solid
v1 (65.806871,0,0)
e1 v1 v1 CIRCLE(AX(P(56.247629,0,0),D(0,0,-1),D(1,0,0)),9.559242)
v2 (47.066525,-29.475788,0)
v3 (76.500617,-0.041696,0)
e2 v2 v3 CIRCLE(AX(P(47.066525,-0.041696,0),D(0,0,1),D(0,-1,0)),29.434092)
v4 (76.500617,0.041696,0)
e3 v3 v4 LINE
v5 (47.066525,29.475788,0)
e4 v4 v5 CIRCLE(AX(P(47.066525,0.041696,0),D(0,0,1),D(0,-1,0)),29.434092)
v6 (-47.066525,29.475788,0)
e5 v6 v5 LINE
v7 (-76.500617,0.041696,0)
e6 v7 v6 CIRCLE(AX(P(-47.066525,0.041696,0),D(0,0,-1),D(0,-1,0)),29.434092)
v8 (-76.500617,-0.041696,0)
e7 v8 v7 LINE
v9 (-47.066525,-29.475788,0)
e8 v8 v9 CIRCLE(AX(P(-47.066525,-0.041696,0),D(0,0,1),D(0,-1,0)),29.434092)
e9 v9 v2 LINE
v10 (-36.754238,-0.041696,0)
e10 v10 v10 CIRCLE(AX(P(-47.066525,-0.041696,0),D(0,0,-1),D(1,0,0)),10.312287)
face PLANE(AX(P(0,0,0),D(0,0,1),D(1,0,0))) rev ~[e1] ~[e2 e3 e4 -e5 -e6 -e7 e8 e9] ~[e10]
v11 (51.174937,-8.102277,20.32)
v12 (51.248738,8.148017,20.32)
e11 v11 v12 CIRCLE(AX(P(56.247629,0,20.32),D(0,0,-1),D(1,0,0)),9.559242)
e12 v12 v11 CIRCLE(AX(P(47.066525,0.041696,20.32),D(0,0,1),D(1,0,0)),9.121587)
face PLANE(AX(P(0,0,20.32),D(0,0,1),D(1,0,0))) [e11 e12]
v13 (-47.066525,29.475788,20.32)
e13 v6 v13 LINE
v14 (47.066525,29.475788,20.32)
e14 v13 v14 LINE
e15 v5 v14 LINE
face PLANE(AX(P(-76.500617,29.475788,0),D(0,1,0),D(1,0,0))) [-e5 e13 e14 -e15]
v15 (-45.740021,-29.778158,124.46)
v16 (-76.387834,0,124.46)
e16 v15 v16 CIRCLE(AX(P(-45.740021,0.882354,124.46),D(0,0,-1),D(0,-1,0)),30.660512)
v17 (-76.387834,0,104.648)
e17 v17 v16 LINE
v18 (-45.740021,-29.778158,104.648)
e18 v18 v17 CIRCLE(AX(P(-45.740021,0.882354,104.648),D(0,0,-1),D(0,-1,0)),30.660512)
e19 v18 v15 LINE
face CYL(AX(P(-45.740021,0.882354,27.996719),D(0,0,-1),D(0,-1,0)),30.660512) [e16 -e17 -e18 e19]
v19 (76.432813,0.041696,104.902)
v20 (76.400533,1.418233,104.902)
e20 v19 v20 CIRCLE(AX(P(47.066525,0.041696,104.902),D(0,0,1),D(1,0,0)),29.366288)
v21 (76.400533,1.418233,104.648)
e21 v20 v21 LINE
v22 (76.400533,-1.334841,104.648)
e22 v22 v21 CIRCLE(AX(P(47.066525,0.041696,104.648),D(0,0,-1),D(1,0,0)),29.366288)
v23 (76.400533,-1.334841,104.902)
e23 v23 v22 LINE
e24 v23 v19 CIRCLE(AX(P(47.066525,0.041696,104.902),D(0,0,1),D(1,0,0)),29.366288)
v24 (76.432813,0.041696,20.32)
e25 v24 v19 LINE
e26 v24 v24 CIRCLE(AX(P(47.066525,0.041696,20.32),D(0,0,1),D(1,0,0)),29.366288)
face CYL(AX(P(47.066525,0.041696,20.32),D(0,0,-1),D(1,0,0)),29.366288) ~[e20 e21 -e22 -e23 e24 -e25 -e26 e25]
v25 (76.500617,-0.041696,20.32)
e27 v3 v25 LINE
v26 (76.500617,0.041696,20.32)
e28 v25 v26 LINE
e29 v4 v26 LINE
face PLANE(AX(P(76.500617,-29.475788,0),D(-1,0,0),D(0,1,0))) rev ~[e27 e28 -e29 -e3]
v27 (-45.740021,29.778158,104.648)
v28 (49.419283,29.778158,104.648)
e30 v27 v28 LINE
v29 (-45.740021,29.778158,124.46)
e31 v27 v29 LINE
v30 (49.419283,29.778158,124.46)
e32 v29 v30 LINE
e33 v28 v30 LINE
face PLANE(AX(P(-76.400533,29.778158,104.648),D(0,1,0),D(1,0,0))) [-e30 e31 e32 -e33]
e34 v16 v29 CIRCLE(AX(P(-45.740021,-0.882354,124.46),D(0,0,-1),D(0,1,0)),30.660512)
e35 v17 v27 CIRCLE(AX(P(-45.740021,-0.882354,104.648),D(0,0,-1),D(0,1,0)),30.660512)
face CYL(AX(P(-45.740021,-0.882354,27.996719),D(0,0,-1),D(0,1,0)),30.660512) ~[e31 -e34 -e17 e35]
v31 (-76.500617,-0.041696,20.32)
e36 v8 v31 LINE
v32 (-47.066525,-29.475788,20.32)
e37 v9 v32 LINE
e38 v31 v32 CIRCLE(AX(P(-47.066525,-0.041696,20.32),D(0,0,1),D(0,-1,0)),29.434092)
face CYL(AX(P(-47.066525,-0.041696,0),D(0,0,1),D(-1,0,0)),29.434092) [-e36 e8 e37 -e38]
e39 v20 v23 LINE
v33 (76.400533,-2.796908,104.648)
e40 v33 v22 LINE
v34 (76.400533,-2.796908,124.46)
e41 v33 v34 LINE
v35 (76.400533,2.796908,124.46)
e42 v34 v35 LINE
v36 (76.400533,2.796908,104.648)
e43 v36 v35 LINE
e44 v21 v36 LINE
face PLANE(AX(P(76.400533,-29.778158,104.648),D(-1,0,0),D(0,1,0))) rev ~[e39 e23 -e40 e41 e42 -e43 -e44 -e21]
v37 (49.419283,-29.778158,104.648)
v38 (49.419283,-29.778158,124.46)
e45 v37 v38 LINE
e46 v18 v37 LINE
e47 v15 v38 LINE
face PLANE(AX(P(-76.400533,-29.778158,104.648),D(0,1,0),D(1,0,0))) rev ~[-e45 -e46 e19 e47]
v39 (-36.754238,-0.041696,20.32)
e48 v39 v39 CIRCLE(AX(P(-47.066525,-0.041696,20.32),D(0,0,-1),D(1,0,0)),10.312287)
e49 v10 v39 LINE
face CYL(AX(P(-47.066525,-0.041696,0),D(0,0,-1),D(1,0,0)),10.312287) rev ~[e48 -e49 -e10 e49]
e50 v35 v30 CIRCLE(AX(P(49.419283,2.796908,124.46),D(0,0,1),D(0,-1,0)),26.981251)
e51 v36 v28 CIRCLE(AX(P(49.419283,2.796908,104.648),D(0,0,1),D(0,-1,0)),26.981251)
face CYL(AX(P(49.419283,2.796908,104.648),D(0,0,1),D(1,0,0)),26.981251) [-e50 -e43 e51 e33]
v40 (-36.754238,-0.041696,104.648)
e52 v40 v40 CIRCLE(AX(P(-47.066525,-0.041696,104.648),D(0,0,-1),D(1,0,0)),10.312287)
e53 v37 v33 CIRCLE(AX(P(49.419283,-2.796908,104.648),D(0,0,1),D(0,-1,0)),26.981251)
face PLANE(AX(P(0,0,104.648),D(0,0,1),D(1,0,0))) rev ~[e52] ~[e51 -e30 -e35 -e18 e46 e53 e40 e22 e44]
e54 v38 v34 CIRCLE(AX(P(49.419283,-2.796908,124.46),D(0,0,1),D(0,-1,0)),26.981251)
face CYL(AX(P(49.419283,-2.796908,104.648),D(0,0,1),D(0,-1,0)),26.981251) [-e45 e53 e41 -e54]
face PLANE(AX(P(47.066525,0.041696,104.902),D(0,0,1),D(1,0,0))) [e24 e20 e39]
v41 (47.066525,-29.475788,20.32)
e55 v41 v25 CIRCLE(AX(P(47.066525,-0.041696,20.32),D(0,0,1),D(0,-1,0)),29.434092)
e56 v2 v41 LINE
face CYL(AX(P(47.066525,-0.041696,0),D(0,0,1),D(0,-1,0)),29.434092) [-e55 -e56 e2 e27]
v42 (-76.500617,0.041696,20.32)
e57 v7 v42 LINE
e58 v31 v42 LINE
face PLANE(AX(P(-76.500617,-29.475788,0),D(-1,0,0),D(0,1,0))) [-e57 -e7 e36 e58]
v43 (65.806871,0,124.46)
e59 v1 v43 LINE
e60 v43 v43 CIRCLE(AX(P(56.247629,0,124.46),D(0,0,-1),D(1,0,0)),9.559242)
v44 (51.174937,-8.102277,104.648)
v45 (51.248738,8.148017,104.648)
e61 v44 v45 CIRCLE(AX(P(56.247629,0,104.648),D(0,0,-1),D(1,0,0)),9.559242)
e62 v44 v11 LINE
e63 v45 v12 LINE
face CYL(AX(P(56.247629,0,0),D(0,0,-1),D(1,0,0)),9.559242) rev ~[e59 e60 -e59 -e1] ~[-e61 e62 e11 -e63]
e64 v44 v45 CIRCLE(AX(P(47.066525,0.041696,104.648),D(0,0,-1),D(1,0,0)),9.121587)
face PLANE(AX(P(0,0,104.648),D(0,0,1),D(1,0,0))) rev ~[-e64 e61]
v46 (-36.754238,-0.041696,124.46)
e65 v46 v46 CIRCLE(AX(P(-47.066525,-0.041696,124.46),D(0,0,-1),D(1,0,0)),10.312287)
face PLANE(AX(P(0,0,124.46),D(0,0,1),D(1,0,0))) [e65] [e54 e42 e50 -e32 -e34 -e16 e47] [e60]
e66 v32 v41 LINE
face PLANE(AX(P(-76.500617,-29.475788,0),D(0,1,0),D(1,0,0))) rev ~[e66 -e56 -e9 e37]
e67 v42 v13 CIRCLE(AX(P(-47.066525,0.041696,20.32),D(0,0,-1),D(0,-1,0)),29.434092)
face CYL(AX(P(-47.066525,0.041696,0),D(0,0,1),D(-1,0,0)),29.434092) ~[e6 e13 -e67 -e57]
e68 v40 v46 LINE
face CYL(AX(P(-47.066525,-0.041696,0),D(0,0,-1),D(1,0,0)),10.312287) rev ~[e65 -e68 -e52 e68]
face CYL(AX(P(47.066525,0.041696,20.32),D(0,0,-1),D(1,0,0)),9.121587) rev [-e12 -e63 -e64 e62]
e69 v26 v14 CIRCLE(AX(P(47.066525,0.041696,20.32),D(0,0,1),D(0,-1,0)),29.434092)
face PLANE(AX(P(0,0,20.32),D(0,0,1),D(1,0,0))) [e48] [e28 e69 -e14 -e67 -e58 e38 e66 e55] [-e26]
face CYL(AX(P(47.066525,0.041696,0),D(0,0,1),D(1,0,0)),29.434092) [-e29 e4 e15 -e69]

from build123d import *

# Parameters (mm, degrees)
F0_W         = 153.0012339354
F0_H         = 58.951575309
F1_DEPTH     = 20.32
F2_R         = 29.4340917525
F3_R         = 29.3662882484
F3_R_2       = 9.1215869303
F4_DEPTH     = 84.582
F5_DEPTH     = 84.583
F6_R         = 12.0800155098
F7_DEPTH     = 84.583
F9_W         = 152.801066637
F9_H         = 59.5563165843
F10_DEPTH    = 19.812
F11_R        = 10.3122867818
F12_DEPTH    = 124.461
F13_T1_DEPTH = 173.1145612107
F14_R        = 26.9812507731
F15_R        = 9.5592417263
F16_DEPTH    = 124.461


# Not quite as in the source:
# - a fillet or chamfer that OpenCascade refuses, or shapes differently, is made with other operations: its cross-section is extruded or revolved along the edge and cut away or added


with BuildPart() as f1:
    # F0 (on Top) → F1 (new body)
    with BuildSketch(Plane.XY):
        Rectangle(F0_W, F0_H)
    extrude(amount=F1_DEPTH)

    # F2
    f2_edges = [f1.edges().sort_by_distance(p)[0] for p in [
        (-76.500617, -29.475788, 10.16),
        (-76.500617, 29.475788, 10.16),
        (76.500617, -29.475788, 10.16),
        (76.500617, 29.475788, 10.16),
    ]]
    fillet(f2_edges, radius=F2_R)

    # F3 (on face) → F4 (join)
    with BuildSketch(Plane.XY.offset(20.32)):
        with Locations((47.0665252152, 0.0416959021)):
            Circle(F3_R)
        with Locations((47.0665252152, 0.0416959021)):
            Circle(F3_R_2, mode=Mode.SUBTRACT)
    extrude(amount=F4_DEPTH)

    # F5 (cut, through all): a face of the model
    f5_faces = [f1.faces().sort_by_distance(p)[0] for p in [
        (47.0665252152, 0.0416959021, 20.32),
    ]]
    extrude(f5_faces, amount=F5_DEPTH, mode=Mode.SUBTRACT)

    # F6 (on face) → F7 (cut, through all)
    with BuildSketch(Plane.XY.offset(20.32)):
        with Locations((-47.0665252152, 0.0416959021)):
            Circle(F6_R)
    extrude(amount=F7_DEPTH, mode=Mode.SUBTRACT)

    # F9 (on offset) → F10 (join)
    with BuildSketch(Plane.XY.offset(104.648)):
        Rectangle(F9_W, F9_H)
    extrude(amount=F10_DEPTH)

    # F11 (on face) → F12 (cut, through all)
    with BuildSketch(Plane(origin=(0, 0, 0), x_dir=(1, 0, 0), z_dir=(0, 0, -1))):
        with Locations((-47.0665252152, 0.0416959021)):
            Circle(F11_R)
    extrude(amount=-F12_DEPTH, mode=Mode.SUBTRACT)

    # F13: fillet of radius 30.6605122421 on 2 edges, made by hand

    # F13_s2 → F13_t1 (cut)
    with BuildSketch(Plane.XY.offset(27.9967193947)):
        with BuildLine():
            ThreePointArc((-45.7400210764, -29.7781582922), (-67.4202771975, -20.7979021711), (-76.4005333185, 0.88235395))
            Line((-76.4005333185, 0.88235395), (-76.4005333185, -29.7781582922))
            Line((-76.4005333185, -29.7781582922), (-45.7400210764, -29.7781582922))
        make_face()
        with BuildLine():
            ThreePointArc((-45.7400210764, 29.7781582922), (-67.4202771975, 20.7979021711), (-76.4005333185, -0.88235395))
            Line((-76.4005333185, -0.88235395), (-76.4005333185, 29.7781582922))
            Line((-76.4005333185, 29.7781582922), (-45.7400210764, 29.7781582922))
        make_face()
    extrude(amount=F13_T1_DEPTH, mode=Mode.SUBTRACT)

    # F14
    f14_edges = [f1.edges().sort_by_distance(p)[0] for p in [
        (76.400533, -29.778158, 114.554),
        (76.400533, 29.778158, 114.554),
    ]]
    fillet(f14_edges, radius=F14_R)

    # F15 (on face) → F16 (cut, through all)
    with BuildSketch(Plane(origin=(0, 0, 0), x_dir=(1, 0, 0), z_dir=(0, 0, -1))):
        with Locations((56.2476292253, 0)):
            Circle(F15_R)
    extrude(amount=-F16_DEPTH, mode=Mode.SUBTRACT)


solid = f1.part
